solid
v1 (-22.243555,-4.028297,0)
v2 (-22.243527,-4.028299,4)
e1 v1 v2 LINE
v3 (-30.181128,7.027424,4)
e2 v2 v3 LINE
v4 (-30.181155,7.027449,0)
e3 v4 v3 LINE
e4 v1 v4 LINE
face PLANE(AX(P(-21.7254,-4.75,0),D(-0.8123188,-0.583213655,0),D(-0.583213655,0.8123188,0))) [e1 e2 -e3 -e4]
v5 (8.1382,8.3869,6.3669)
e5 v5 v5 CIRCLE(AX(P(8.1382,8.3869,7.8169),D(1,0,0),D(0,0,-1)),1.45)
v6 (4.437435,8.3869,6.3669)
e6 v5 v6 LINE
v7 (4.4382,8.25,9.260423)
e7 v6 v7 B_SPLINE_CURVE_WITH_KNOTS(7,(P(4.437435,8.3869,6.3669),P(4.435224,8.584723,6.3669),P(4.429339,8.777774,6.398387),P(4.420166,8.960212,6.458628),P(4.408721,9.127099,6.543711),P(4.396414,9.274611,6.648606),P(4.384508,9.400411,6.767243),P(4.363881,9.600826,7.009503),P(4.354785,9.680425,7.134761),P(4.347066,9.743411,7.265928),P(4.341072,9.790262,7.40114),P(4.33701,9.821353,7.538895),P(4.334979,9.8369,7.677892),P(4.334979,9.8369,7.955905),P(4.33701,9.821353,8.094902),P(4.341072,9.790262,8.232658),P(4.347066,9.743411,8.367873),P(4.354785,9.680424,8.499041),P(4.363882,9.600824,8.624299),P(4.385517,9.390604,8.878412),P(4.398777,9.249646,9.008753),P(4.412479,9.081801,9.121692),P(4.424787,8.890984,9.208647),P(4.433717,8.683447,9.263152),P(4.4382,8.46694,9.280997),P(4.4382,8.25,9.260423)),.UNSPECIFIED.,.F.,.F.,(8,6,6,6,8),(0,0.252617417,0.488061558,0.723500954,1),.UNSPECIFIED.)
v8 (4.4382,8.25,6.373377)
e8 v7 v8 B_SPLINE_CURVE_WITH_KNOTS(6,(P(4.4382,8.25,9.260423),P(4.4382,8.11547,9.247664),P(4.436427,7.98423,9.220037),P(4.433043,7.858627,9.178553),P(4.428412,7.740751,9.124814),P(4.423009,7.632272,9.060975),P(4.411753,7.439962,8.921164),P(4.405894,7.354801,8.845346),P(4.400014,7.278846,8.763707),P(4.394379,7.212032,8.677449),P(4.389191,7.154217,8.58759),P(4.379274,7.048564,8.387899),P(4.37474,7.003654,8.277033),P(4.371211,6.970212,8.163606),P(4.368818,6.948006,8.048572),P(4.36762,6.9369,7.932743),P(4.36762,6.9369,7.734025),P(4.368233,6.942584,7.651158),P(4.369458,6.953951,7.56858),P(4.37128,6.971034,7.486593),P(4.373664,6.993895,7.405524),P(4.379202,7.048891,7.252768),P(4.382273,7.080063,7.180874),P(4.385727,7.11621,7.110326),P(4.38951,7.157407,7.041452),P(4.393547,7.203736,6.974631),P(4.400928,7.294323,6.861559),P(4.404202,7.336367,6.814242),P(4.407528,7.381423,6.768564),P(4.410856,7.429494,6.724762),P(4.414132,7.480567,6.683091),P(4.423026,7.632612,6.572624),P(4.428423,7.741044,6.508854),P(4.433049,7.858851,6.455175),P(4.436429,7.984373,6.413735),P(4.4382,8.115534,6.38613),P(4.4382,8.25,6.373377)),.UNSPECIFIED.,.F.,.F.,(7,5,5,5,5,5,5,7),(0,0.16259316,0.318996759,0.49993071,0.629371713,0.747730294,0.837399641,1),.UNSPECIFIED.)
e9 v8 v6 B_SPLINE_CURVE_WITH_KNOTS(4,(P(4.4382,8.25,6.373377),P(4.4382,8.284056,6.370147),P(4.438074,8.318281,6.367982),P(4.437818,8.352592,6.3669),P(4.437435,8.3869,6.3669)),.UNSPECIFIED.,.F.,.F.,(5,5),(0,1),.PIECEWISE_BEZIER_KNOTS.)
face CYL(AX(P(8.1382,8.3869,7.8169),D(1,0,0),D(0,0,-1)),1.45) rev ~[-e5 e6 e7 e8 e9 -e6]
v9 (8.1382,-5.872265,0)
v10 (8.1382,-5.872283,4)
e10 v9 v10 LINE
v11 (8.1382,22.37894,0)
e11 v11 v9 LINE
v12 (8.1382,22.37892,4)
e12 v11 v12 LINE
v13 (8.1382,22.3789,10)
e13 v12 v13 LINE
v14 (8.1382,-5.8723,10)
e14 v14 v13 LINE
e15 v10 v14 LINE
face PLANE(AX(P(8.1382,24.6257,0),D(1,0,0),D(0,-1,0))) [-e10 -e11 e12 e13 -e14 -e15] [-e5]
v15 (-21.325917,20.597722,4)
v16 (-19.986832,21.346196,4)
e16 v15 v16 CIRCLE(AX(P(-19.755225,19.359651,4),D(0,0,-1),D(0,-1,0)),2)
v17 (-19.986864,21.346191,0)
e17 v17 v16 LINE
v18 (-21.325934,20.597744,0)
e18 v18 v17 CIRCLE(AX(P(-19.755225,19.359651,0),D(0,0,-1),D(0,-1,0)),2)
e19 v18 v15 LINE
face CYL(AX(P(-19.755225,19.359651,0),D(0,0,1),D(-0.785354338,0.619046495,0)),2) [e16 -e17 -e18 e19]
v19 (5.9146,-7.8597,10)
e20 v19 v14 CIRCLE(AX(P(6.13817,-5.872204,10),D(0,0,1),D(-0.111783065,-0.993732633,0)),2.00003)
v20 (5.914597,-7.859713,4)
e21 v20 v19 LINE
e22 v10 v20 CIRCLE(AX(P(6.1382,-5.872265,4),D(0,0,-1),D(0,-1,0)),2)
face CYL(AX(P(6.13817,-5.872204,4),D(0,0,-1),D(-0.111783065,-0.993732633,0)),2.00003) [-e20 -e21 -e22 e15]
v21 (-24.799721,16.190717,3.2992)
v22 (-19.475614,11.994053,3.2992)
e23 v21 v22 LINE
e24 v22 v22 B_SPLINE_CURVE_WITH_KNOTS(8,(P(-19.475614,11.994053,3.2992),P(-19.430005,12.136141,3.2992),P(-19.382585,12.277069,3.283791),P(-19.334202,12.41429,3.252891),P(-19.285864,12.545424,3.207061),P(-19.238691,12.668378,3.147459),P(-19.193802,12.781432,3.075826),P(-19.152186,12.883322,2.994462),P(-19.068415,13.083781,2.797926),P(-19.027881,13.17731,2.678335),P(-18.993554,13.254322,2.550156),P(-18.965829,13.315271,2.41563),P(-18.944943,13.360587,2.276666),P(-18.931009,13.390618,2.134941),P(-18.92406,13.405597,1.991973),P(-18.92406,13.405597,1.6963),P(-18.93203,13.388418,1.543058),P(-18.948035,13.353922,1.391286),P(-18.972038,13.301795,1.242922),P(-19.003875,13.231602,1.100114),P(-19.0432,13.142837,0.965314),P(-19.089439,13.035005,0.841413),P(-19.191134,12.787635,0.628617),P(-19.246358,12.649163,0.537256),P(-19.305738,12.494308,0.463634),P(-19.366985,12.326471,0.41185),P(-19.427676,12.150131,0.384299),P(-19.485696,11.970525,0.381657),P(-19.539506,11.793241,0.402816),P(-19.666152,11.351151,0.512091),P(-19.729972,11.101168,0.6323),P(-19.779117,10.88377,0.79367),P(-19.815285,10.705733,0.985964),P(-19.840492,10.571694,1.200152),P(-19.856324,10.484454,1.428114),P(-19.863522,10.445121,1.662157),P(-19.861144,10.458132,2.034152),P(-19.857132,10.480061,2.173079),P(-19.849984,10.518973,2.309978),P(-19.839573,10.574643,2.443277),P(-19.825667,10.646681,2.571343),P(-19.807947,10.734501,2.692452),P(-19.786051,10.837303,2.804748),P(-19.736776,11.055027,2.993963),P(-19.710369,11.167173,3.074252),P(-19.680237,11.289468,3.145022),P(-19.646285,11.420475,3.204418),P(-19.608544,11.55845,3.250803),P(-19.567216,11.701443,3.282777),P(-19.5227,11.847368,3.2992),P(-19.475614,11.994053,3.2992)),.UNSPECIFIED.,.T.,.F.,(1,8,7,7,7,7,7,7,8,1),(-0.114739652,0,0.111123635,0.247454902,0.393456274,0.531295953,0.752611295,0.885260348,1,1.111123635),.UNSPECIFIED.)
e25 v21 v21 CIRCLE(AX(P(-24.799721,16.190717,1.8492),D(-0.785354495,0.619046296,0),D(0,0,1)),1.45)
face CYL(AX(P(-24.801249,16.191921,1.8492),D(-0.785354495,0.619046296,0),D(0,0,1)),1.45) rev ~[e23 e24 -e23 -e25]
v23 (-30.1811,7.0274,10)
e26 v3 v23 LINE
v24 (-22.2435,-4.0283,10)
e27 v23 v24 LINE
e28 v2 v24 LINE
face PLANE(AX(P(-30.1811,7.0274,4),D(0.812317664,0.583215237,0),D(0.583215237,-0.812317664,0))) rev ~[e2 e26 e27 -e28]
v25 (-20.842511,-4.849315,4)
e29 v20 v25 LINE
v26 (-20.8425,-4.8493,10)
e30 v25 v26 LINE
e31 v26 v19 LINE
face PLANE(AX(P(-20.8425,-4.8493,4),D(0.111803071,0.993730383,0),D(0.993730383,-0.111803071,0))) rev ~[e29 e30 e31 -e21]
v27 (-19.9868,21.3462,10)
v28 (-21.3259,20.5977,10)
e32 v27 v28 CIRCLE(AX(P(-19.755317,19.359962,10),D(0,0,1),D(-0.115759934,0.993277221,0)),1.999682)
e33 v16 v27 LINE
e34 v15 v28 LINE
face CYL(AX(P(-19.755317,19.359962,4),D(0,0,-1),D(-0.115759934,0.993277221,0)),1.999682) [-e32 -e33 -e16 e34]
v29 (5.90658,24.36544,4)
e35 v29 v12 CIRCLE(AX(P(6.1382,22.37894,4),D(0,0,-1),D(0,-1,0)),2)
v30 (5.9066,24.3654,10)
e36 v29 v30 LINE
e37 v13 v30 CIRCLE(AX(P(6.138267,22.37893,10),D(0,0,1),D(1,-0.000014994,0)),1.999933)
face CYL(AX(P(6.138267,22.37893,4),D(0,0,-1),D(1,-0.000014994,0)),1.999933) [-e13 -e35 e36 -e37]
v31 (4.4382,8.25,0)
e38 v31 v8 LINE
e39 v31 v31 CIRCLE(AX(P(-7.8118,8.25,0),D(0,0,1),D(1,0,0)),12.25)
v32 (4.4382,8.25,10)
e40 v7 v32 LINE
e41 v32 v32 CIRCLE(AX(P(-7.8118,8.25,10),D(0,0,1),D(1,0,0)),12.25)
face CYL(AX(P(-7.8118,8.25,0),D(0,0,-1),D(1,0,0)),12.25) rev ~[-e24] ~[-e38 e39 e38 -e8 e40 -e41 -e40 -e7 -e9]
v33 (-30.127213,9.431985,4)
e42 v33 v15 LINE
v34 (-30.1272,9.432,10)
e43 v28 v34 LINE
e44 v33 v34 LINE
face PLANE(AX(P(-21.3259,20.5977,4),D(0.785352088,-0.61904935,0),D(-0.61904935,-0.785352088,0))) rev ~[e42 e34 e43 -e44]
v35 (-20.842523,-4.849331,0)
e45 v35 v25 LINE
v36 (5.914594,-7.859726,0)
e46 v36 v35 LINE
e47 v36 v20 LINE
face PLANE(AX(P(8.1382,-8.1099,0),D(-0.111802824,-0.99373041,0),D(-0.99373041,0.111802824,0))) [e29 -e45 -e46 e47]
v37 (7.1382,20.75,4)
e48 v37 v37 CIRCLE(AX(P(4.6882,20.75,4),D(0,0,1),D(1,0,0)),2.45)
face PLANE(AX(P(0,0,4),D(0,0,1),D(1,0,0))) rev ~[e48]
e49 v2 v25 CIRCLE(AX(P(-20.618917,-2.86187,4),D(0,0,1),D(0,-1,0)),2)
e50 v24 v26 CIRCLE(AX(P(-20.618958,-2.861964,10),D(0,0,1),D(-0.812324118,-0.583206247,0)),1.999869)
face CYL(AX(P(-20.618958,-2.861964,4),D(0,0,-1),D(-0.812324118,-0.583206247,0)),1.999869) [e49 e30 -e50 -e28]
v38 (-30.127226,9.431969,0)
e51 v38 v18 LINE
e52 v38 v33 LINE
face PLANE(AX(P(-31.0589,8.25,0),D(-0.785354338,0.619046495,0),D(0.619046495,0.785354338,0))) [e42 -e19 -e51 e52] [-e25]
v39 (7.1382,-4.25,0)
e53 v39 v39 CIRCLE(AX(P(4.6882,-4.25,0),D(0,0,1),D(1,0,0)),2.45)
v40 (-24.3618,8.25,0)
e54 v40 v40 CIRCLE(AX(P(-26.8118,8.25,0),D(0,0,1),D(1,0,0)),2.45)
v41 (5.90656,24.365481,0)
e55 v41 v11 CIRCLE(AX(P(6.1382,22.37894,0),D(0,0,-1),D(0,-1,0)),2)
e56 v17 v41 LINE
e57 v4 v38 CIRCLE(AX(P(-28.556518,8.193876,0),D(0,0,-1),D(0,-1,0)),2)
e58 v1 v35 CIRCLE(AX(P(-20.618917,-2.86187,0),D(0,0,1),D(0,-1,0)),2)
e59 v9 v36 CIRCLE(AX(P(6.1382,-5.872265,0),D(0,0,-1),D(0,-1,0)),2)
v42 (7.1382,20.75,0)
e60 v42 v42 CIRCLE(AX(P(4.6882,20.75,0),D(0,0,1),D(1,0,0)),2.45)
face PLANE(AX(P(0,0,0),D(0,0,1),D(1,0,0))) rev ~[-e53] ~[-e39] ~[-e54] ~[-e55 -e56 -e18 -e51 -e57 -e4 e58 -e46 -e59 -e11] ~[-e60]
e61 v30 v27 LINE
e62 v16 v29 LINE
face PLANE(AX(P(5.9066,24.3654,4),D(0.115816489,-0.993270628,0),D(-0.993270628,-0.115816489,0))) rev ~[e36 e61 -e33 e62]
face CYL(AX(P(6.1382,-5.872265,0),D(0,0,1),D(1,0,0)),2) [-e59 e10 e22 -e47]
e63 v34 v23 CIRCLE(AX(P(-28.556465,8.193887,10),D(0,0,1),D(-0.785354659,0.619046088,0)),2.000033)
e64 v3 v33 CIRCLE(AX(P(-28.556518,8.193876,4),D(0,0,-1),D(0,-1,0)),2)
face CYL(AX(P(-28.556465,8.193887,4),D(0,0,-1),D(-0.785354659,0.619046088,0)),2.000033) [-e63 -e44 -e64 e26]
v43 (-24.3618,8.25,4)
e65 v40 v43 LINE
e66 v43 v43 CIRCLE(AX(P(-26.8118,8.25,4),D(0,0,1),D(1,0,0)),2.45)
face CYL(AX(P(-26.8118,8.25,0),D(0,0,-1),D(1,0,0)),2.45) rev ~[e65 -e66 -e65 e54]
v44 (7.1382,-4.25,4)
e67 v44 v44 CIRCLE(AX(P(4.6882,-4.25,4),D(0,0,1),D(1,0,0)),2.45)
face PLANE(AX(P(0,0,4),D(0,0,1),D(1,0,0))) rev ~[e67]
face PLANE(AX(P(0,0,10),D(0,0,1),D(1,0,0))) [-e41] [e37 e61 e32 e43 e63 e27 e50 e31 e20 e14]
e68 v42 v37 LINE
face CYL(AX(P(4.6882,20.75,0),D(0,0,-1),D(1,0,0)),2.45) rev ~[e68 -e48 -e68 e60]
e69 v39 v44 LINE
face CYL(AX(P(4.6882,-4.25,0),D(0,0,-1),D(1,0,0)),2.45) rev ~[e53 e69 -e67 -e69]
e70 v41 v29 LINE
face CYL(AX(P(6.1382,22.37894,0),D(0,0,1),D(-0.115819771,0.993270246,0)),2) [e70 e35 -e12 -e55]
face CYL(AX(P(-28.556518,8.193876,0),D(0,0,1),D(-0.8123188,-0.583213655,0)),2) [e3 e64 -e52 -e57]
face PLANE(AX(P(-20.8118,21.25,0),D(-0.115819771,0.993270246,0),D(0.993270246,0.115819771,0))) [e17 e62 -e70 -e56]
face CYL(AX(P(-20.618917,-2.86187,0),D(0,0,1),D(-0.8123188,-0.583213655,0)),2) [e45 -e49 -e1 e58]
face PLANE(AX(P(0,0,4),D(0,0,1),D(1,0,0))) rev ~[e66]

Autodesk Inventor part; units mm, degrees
ref_plane "YZ Plane" through (0, 0, 0) normal (1, 0, 0) x (0, 1, 0)
ref_plane "XZ Plane" through (0, 0, 0) normal (0, 1, 0) x (-1, 0, 0)
ref_plane "XY Plane" through (0, 0, 0) normal (0, 0, 1) x (1, 0, 0)
sketch "Sketch1" plane through (0, 0, 0) normal (0, 0, 1) x (1, 0, 0)
  arc A0 (-5.5118, -5.25) -> (-5.5118, 21.75) centre (-8.0118, 8.25) ccw construction
  circle A1 centre (-7.8118, 8.25) radius 10 construction
  circle A2 centre (-7.8118, 8.25) radius 12.15 construction
  line L0 (-5.5118, -8.25) -> (-5.5118, -5.25) construction
  line L1 (7.4882, -8.25) -> (-5.5118, -8.25) construction
  line L2 (11.0118, -4.7265) -> (7.4882, -8.25) construction
  line L3 (11.0118, -4.7265) -> (11.0118, 21.2265) construction
  line L4 (11.0118, 21.2265) -> (7.4882, 24.75) construction
  line L5 (7.4882, 24.75) -> (-5.5118, 24.75) construction
  line L6 (-5.5118, 24.75) -> (-5.5118, 21.75) construction
  arc A3 (-5.5118, -5.25) -> (-5.5118, 21.75) centre (-8.0118, 8.25) ccw construction
  line L7 (5.7178, 24.75) -> (38.7178, 24.75) construction
  circle A4 centre (-26.8118, 8.25) radius 1.45 projected
  circle A5 centre (4.6882, -4.25) radius 1.45 projected
  arc A6 (-22.4732, 11.4188) -> (-22.4732, 5.0812) centre (-7.8118, 8.25) ccw projected
  line L8 (-22.4732, 5.0812) -> (-3.2253, -6.0316) construction
  arc A7 (-3.2253, -6.0316) -> (2.2632, -2.8628) centre (-7.8118, 8.25) ccw projected
  line L9 (2.2632, 19.3628) -> (2.2632, -2.8628) construction
  arc A8 (2.2632, 19.3628) -> (-3.2253, 22.5316) centre (-7.8118, 8.25) ccw projected
  line L10 (-22.4732, 11.4188) -> (-3.2253, 22.5316) construction
  line L11 (-32.9624, -8.8) -> (-32.9624, 25.3) projected
  line L12 (-32.9624, 25.3) -> (-29.2731, 25.3) projected
  line L13 (-29.2731, 25.3) -> (-24.8618, 29.7113) projected
  line L14 (-24.8618, 29.7113) -> (-24.8618, 33.4006) projected
  line L15 (-24.8618, 33.4006) -> (9.2382, 33.4006) projected
  line L16 (9.2382, 33.4006) -> (9.2382, 29.7113) projected
  line L17 (9.2382, 29.7113) -> (13.6496, 25.3) projected
  line L18 (13.6496, 25.3) -> (17.3389, 25.3) projected
  line L19 (17.3389, 25.3) -> (17.3389, -8.8) projected
  line L20 (17.3389, -8.8) -> (13.6496, -8.8) projected
  line L21 (13.6496, -8.8) -> (9.2382, -13.2113) projected
  line L22 (9.2382, -13.2113) -> (9.2382, -16.9006) projected
  line L23 (9.2382, -16.9006) -> (-24.8618, -16.9006) projected
  line L24 (-24.8618, -16.9006) -> (-24.8618, -13.2113) projected
  line L25 (-24.8618, -13.2113) -> (-29.2731, -8.8) projected
  line L26 (-29.2731, -8.8) -> (-32.9624, -8.8) projected
  circle A9 centre (4.6882, 20.75) radius 1.45 projected
  line L27 (-21.7254, -4.75) -> (-31.0589, 8.25)
  line L28 (-31.0589, 8.25) -> (-20.8118, 21.25)
  circle A10 centre (-7.8118, 8.25) radius 12.5 construction
  circle A11 centre (4.6882, -4.25) radius 2.45
  circle A12 centre (4.6882, 20.75) radius 2.45
  circle A13 centre (-26.8118, 8.25) radius 2.45
  circle A14 centre (-7.8118, 8.25) radius 10 projected
  circle A15 centre (-7.8118, 8.25) radius 10 projected
  circle A16 centre (-7.8118, 8.25) radius 10 projected
  circle A17 centre (-7.8118, 8.25) radius 12.25
  line L29 (-20.8118, 21.25) -> (8.1382, 24.6257)
  line L30 (8.1382, 24.6257) -> (8.1382, -8.1099)
  line L31 (8.1382, -8.1099) -> (-21.7254, -4.75)
  circle A18 centre (4.6882, -4.25) radius 3.45 construction
  circle A19 centre (4.6882, 20.75) radius 3.45 construction
  circle A20 centre (-26.8118, 8.25) radius 3.45 construction
  dimension "d12" = 13
  dimension "d14" = 13
  dimension "d15" = 13
  dimension "d16" = 0
  dimension "d17" = 4.9
  dimension "d18" = 4.9
  dimension "d19" = 4.9
  dimension "d25" = 24.5
  dimension "d32" = 1
  dimension "d33" = 1
  dimension "d35" = 1
extrude "Extrusion1" add sketch "Sketch1" along normal blind 4 contours L27 L28 L29 L30 L31
sketch "Sketch3" plane through (0, 0, 0) normal (0, 0, -1) x (-1, 0, 0)
  circle A0 centre (-4.6882, 20.75) radius 1.45 projected
  circle A1 centre (26.8118, 8.25) radius 1.45 projected
  circle A2 centre (-4.6882, -4.25) radius 1.45 projected
  circle A3 centre (7.8118, 8.25) radius 14 projected
  line L0 (1.437, 26.1707) -> (-0.0466, 24.25) projected
  line L1 (1.437, 25.85) -> (1.437, 26.1707) projected
  line L2 (7.7704, 25.85) -> (1.437, 25.85) projected
  line L3 (7.7704, 32.85) -> (7.7704, 25.85) projected
  line L4 (15.1593, 24.25) -> (7.7704, 32.85) projected
  line L5 (15.1593, 24.25) -> (23.8118, 24.25) projected
  line L6 (23.8118, 24.25) -> (30.5959, 9.0658) projected
  arc A4 (30.5959, 7.4342) -> (30.5959, 9.0658) centre (28.7698, 8.25) ccw projected
  line L7 (30.5959, 7.4342) -> (23.8118, -7.75) projected
  line L8 (23.8118, -7.75) -> (15.1593, -7.75) projected
  line L9 (15.1593, -7.75) -> (7.7704, -16.35) projected
  line L10 (7.7704, -9.35) -> (7.7704, -16.35) projected
  line L11 (1.437, -9.35) -> (7.7704, -9.35) projected
  line L12 (1.437, -9.6707) -> (1.437, -9.35) projected
  line L13 (1.437, -9.6707) -> (-0.0466, -7.75) projected
  line L14 (-0.0466, -7.75) -> (-8.1882, -7.75) projected
  line L15 (-8.1882, -7.75) -> (-10.9318, -5.0065) projected
  line L16 (-10.9318, -5.0065) -> (-10.9318, 21.5065) projected
  line L17 (-10.9318, 21.5065) -> (-8.1882, 24.25) projected
  line L18 (-8.1882, 24.25) -> (-0.0466, 24.25) projected
  point P0 (0, 0)
fillet "Fillet1" radius 2 5 edges at (-31.0589, 8.25, 2) (-20.8118, 21.25, 2) (-21.7254, -4.75, 2) (8.1382, 24.6257, 2) (8.1382, -8.1099, 2)
sketch "Sketch5" plane through (-21.3259, 20.5977, 0) normal (-0.7853545, 0.6190463, 0) x (0, 0, 1)
  circle A0 centre (1.8492, -5.6115) radius 1.45
  point P0 (0, -2.9748)
  dimension "d21" = 2.9
extrude "Extrusion3" cut sketch "Sketch5" against normal blind 10
sketch "Sketch6" plane through (0, 0, 4) normal (0, 0, 1) x (1, 0, 0)
  arc A0 (-19.9868, 21.3462) -> (-21.3259, 20.5977) centre (-19.7552, 19.3596) ccw projected
  line L0 (-21.3259, 20.5977) -> (-30.1272, 9.432) projected
  arc A1 (-30.1272, 9.432) -> (-30.1811, 7.0274) centre (-28.5565, 8.1939) ccw projected
  line L1 (-30.1811, 7.0274) -> (-22.2435, -4.0283) projected
  arc A2 (-22.2435, -4.0283) -> (-20.8425, -4.8493) centre (-20.6189, -2.8619) ccw projected
  circle A3 centre (-26.8118, 8.25) radius 2.45 projected
  circle A4 centre (4.6882, 20.75) radius 2.45 projected
  circle A5 centre (4.6882, -4.25) radius 2.45 projected
  circle A6 centre (-7.8118, 8.25) radius 12.25 projected
  line L2 (-20.8425, -4.8493) -> (5.9146, -7.8597) projected
  line L3 (8.1382, -5.8723) -> (8.1382, 22.3789) projected
  line L4 (5.9066, 24.3654) -> (-19.9868, 21.3462) projected
  arc A7 (5.9146, -7.8597) -> (8.1382, -5.8723) centre (6.1382, -5.8723) ccw projected
  arc A8 (8.1382, 22.3789) -> (5.9066, 24.3654) centre (6.1382, 22.3789) ccw projected
  point P0 (0, 0)
extrude "Extrusion4" add sketch "Sketch6" along normal blind 6 contours L4 A8 L3 A7 L2 A2 L1 A1 L0 A0 | A3 | A4 | A5
sketch "Sketch7" plane through (8.1382, -5.9842, 0) normal (1, 0, 0) x (0, 0, -1)
  spline S0 degree 3 poles (-20.3248, 15.4894) (-20.4822, 15.4894) (-20.6498, 15.4578) (-20.9577, 15.3301) (-21.098, 15.234) (-21.3195, 15.0125) (-21.4156, 14.8722) (-21.5433, 14.5643) (-21.5748, 14.3967) (-21.5748, 14.082) (-21.5433, 13.9144) (-21.4156, 13.6065) (-21.3195, 13.4662) (-21.098, 13.2447) (-20.9577, 13.1486) (-20.6498, 13.0209) (-20.4822, 12.9894) (-20.1675, 12.9894) (-19.9999, 13.0209) (-19.692, 13.1486) (-19.5517, 13.2447) (-19.3302, 13.4662) (-19.2341, 13.6065) (-19.1064, 13.9144) (-19.0748, 14.082) (-19.0748, 14.3967) (-19.1064, 14.5643) (-19.2341, 14.8722) (-19.3302, 15.0125) (-19.5517, 15.234) (-19.692, 15.3301) (-19.9999, 15.4578) (-20.1675, 15.4894) (-20.3248, 15.4894) knots 0 0 0 0 0.047214 0.047214 0.094427 0.094427 0.141639 0.141639 0.18885 0.18885 0.236062 0.236062 0.283273 0.283273 0.330487 0.330487 0.3777 0.3777 0.424914 0.424914 0.472128 0.472128 0.519339 0.519339 0.56655 0.56655 0.613762 0.613762 0.660973 0.660973 0.708187 0.708187 0.755401 0.755401 0.755401 0.755401 projected
  circle A0 centre (-14.6316, 14.3711) radius 1.45
  circle A1 centre (-7.8169, 14.3711) radius 1.45
  point P0 (0, 5.9842)
  point P1 (-20.3248, 15.4894)
  dimension "d28" = 2.9
  dimension "d29" = 2.9
extrude "Extrusion5" cut sketch "Sketch7" against normal blind 16 contours A0 | A1
properties part number "cellSTORM_inverted_objectiveadapter"
